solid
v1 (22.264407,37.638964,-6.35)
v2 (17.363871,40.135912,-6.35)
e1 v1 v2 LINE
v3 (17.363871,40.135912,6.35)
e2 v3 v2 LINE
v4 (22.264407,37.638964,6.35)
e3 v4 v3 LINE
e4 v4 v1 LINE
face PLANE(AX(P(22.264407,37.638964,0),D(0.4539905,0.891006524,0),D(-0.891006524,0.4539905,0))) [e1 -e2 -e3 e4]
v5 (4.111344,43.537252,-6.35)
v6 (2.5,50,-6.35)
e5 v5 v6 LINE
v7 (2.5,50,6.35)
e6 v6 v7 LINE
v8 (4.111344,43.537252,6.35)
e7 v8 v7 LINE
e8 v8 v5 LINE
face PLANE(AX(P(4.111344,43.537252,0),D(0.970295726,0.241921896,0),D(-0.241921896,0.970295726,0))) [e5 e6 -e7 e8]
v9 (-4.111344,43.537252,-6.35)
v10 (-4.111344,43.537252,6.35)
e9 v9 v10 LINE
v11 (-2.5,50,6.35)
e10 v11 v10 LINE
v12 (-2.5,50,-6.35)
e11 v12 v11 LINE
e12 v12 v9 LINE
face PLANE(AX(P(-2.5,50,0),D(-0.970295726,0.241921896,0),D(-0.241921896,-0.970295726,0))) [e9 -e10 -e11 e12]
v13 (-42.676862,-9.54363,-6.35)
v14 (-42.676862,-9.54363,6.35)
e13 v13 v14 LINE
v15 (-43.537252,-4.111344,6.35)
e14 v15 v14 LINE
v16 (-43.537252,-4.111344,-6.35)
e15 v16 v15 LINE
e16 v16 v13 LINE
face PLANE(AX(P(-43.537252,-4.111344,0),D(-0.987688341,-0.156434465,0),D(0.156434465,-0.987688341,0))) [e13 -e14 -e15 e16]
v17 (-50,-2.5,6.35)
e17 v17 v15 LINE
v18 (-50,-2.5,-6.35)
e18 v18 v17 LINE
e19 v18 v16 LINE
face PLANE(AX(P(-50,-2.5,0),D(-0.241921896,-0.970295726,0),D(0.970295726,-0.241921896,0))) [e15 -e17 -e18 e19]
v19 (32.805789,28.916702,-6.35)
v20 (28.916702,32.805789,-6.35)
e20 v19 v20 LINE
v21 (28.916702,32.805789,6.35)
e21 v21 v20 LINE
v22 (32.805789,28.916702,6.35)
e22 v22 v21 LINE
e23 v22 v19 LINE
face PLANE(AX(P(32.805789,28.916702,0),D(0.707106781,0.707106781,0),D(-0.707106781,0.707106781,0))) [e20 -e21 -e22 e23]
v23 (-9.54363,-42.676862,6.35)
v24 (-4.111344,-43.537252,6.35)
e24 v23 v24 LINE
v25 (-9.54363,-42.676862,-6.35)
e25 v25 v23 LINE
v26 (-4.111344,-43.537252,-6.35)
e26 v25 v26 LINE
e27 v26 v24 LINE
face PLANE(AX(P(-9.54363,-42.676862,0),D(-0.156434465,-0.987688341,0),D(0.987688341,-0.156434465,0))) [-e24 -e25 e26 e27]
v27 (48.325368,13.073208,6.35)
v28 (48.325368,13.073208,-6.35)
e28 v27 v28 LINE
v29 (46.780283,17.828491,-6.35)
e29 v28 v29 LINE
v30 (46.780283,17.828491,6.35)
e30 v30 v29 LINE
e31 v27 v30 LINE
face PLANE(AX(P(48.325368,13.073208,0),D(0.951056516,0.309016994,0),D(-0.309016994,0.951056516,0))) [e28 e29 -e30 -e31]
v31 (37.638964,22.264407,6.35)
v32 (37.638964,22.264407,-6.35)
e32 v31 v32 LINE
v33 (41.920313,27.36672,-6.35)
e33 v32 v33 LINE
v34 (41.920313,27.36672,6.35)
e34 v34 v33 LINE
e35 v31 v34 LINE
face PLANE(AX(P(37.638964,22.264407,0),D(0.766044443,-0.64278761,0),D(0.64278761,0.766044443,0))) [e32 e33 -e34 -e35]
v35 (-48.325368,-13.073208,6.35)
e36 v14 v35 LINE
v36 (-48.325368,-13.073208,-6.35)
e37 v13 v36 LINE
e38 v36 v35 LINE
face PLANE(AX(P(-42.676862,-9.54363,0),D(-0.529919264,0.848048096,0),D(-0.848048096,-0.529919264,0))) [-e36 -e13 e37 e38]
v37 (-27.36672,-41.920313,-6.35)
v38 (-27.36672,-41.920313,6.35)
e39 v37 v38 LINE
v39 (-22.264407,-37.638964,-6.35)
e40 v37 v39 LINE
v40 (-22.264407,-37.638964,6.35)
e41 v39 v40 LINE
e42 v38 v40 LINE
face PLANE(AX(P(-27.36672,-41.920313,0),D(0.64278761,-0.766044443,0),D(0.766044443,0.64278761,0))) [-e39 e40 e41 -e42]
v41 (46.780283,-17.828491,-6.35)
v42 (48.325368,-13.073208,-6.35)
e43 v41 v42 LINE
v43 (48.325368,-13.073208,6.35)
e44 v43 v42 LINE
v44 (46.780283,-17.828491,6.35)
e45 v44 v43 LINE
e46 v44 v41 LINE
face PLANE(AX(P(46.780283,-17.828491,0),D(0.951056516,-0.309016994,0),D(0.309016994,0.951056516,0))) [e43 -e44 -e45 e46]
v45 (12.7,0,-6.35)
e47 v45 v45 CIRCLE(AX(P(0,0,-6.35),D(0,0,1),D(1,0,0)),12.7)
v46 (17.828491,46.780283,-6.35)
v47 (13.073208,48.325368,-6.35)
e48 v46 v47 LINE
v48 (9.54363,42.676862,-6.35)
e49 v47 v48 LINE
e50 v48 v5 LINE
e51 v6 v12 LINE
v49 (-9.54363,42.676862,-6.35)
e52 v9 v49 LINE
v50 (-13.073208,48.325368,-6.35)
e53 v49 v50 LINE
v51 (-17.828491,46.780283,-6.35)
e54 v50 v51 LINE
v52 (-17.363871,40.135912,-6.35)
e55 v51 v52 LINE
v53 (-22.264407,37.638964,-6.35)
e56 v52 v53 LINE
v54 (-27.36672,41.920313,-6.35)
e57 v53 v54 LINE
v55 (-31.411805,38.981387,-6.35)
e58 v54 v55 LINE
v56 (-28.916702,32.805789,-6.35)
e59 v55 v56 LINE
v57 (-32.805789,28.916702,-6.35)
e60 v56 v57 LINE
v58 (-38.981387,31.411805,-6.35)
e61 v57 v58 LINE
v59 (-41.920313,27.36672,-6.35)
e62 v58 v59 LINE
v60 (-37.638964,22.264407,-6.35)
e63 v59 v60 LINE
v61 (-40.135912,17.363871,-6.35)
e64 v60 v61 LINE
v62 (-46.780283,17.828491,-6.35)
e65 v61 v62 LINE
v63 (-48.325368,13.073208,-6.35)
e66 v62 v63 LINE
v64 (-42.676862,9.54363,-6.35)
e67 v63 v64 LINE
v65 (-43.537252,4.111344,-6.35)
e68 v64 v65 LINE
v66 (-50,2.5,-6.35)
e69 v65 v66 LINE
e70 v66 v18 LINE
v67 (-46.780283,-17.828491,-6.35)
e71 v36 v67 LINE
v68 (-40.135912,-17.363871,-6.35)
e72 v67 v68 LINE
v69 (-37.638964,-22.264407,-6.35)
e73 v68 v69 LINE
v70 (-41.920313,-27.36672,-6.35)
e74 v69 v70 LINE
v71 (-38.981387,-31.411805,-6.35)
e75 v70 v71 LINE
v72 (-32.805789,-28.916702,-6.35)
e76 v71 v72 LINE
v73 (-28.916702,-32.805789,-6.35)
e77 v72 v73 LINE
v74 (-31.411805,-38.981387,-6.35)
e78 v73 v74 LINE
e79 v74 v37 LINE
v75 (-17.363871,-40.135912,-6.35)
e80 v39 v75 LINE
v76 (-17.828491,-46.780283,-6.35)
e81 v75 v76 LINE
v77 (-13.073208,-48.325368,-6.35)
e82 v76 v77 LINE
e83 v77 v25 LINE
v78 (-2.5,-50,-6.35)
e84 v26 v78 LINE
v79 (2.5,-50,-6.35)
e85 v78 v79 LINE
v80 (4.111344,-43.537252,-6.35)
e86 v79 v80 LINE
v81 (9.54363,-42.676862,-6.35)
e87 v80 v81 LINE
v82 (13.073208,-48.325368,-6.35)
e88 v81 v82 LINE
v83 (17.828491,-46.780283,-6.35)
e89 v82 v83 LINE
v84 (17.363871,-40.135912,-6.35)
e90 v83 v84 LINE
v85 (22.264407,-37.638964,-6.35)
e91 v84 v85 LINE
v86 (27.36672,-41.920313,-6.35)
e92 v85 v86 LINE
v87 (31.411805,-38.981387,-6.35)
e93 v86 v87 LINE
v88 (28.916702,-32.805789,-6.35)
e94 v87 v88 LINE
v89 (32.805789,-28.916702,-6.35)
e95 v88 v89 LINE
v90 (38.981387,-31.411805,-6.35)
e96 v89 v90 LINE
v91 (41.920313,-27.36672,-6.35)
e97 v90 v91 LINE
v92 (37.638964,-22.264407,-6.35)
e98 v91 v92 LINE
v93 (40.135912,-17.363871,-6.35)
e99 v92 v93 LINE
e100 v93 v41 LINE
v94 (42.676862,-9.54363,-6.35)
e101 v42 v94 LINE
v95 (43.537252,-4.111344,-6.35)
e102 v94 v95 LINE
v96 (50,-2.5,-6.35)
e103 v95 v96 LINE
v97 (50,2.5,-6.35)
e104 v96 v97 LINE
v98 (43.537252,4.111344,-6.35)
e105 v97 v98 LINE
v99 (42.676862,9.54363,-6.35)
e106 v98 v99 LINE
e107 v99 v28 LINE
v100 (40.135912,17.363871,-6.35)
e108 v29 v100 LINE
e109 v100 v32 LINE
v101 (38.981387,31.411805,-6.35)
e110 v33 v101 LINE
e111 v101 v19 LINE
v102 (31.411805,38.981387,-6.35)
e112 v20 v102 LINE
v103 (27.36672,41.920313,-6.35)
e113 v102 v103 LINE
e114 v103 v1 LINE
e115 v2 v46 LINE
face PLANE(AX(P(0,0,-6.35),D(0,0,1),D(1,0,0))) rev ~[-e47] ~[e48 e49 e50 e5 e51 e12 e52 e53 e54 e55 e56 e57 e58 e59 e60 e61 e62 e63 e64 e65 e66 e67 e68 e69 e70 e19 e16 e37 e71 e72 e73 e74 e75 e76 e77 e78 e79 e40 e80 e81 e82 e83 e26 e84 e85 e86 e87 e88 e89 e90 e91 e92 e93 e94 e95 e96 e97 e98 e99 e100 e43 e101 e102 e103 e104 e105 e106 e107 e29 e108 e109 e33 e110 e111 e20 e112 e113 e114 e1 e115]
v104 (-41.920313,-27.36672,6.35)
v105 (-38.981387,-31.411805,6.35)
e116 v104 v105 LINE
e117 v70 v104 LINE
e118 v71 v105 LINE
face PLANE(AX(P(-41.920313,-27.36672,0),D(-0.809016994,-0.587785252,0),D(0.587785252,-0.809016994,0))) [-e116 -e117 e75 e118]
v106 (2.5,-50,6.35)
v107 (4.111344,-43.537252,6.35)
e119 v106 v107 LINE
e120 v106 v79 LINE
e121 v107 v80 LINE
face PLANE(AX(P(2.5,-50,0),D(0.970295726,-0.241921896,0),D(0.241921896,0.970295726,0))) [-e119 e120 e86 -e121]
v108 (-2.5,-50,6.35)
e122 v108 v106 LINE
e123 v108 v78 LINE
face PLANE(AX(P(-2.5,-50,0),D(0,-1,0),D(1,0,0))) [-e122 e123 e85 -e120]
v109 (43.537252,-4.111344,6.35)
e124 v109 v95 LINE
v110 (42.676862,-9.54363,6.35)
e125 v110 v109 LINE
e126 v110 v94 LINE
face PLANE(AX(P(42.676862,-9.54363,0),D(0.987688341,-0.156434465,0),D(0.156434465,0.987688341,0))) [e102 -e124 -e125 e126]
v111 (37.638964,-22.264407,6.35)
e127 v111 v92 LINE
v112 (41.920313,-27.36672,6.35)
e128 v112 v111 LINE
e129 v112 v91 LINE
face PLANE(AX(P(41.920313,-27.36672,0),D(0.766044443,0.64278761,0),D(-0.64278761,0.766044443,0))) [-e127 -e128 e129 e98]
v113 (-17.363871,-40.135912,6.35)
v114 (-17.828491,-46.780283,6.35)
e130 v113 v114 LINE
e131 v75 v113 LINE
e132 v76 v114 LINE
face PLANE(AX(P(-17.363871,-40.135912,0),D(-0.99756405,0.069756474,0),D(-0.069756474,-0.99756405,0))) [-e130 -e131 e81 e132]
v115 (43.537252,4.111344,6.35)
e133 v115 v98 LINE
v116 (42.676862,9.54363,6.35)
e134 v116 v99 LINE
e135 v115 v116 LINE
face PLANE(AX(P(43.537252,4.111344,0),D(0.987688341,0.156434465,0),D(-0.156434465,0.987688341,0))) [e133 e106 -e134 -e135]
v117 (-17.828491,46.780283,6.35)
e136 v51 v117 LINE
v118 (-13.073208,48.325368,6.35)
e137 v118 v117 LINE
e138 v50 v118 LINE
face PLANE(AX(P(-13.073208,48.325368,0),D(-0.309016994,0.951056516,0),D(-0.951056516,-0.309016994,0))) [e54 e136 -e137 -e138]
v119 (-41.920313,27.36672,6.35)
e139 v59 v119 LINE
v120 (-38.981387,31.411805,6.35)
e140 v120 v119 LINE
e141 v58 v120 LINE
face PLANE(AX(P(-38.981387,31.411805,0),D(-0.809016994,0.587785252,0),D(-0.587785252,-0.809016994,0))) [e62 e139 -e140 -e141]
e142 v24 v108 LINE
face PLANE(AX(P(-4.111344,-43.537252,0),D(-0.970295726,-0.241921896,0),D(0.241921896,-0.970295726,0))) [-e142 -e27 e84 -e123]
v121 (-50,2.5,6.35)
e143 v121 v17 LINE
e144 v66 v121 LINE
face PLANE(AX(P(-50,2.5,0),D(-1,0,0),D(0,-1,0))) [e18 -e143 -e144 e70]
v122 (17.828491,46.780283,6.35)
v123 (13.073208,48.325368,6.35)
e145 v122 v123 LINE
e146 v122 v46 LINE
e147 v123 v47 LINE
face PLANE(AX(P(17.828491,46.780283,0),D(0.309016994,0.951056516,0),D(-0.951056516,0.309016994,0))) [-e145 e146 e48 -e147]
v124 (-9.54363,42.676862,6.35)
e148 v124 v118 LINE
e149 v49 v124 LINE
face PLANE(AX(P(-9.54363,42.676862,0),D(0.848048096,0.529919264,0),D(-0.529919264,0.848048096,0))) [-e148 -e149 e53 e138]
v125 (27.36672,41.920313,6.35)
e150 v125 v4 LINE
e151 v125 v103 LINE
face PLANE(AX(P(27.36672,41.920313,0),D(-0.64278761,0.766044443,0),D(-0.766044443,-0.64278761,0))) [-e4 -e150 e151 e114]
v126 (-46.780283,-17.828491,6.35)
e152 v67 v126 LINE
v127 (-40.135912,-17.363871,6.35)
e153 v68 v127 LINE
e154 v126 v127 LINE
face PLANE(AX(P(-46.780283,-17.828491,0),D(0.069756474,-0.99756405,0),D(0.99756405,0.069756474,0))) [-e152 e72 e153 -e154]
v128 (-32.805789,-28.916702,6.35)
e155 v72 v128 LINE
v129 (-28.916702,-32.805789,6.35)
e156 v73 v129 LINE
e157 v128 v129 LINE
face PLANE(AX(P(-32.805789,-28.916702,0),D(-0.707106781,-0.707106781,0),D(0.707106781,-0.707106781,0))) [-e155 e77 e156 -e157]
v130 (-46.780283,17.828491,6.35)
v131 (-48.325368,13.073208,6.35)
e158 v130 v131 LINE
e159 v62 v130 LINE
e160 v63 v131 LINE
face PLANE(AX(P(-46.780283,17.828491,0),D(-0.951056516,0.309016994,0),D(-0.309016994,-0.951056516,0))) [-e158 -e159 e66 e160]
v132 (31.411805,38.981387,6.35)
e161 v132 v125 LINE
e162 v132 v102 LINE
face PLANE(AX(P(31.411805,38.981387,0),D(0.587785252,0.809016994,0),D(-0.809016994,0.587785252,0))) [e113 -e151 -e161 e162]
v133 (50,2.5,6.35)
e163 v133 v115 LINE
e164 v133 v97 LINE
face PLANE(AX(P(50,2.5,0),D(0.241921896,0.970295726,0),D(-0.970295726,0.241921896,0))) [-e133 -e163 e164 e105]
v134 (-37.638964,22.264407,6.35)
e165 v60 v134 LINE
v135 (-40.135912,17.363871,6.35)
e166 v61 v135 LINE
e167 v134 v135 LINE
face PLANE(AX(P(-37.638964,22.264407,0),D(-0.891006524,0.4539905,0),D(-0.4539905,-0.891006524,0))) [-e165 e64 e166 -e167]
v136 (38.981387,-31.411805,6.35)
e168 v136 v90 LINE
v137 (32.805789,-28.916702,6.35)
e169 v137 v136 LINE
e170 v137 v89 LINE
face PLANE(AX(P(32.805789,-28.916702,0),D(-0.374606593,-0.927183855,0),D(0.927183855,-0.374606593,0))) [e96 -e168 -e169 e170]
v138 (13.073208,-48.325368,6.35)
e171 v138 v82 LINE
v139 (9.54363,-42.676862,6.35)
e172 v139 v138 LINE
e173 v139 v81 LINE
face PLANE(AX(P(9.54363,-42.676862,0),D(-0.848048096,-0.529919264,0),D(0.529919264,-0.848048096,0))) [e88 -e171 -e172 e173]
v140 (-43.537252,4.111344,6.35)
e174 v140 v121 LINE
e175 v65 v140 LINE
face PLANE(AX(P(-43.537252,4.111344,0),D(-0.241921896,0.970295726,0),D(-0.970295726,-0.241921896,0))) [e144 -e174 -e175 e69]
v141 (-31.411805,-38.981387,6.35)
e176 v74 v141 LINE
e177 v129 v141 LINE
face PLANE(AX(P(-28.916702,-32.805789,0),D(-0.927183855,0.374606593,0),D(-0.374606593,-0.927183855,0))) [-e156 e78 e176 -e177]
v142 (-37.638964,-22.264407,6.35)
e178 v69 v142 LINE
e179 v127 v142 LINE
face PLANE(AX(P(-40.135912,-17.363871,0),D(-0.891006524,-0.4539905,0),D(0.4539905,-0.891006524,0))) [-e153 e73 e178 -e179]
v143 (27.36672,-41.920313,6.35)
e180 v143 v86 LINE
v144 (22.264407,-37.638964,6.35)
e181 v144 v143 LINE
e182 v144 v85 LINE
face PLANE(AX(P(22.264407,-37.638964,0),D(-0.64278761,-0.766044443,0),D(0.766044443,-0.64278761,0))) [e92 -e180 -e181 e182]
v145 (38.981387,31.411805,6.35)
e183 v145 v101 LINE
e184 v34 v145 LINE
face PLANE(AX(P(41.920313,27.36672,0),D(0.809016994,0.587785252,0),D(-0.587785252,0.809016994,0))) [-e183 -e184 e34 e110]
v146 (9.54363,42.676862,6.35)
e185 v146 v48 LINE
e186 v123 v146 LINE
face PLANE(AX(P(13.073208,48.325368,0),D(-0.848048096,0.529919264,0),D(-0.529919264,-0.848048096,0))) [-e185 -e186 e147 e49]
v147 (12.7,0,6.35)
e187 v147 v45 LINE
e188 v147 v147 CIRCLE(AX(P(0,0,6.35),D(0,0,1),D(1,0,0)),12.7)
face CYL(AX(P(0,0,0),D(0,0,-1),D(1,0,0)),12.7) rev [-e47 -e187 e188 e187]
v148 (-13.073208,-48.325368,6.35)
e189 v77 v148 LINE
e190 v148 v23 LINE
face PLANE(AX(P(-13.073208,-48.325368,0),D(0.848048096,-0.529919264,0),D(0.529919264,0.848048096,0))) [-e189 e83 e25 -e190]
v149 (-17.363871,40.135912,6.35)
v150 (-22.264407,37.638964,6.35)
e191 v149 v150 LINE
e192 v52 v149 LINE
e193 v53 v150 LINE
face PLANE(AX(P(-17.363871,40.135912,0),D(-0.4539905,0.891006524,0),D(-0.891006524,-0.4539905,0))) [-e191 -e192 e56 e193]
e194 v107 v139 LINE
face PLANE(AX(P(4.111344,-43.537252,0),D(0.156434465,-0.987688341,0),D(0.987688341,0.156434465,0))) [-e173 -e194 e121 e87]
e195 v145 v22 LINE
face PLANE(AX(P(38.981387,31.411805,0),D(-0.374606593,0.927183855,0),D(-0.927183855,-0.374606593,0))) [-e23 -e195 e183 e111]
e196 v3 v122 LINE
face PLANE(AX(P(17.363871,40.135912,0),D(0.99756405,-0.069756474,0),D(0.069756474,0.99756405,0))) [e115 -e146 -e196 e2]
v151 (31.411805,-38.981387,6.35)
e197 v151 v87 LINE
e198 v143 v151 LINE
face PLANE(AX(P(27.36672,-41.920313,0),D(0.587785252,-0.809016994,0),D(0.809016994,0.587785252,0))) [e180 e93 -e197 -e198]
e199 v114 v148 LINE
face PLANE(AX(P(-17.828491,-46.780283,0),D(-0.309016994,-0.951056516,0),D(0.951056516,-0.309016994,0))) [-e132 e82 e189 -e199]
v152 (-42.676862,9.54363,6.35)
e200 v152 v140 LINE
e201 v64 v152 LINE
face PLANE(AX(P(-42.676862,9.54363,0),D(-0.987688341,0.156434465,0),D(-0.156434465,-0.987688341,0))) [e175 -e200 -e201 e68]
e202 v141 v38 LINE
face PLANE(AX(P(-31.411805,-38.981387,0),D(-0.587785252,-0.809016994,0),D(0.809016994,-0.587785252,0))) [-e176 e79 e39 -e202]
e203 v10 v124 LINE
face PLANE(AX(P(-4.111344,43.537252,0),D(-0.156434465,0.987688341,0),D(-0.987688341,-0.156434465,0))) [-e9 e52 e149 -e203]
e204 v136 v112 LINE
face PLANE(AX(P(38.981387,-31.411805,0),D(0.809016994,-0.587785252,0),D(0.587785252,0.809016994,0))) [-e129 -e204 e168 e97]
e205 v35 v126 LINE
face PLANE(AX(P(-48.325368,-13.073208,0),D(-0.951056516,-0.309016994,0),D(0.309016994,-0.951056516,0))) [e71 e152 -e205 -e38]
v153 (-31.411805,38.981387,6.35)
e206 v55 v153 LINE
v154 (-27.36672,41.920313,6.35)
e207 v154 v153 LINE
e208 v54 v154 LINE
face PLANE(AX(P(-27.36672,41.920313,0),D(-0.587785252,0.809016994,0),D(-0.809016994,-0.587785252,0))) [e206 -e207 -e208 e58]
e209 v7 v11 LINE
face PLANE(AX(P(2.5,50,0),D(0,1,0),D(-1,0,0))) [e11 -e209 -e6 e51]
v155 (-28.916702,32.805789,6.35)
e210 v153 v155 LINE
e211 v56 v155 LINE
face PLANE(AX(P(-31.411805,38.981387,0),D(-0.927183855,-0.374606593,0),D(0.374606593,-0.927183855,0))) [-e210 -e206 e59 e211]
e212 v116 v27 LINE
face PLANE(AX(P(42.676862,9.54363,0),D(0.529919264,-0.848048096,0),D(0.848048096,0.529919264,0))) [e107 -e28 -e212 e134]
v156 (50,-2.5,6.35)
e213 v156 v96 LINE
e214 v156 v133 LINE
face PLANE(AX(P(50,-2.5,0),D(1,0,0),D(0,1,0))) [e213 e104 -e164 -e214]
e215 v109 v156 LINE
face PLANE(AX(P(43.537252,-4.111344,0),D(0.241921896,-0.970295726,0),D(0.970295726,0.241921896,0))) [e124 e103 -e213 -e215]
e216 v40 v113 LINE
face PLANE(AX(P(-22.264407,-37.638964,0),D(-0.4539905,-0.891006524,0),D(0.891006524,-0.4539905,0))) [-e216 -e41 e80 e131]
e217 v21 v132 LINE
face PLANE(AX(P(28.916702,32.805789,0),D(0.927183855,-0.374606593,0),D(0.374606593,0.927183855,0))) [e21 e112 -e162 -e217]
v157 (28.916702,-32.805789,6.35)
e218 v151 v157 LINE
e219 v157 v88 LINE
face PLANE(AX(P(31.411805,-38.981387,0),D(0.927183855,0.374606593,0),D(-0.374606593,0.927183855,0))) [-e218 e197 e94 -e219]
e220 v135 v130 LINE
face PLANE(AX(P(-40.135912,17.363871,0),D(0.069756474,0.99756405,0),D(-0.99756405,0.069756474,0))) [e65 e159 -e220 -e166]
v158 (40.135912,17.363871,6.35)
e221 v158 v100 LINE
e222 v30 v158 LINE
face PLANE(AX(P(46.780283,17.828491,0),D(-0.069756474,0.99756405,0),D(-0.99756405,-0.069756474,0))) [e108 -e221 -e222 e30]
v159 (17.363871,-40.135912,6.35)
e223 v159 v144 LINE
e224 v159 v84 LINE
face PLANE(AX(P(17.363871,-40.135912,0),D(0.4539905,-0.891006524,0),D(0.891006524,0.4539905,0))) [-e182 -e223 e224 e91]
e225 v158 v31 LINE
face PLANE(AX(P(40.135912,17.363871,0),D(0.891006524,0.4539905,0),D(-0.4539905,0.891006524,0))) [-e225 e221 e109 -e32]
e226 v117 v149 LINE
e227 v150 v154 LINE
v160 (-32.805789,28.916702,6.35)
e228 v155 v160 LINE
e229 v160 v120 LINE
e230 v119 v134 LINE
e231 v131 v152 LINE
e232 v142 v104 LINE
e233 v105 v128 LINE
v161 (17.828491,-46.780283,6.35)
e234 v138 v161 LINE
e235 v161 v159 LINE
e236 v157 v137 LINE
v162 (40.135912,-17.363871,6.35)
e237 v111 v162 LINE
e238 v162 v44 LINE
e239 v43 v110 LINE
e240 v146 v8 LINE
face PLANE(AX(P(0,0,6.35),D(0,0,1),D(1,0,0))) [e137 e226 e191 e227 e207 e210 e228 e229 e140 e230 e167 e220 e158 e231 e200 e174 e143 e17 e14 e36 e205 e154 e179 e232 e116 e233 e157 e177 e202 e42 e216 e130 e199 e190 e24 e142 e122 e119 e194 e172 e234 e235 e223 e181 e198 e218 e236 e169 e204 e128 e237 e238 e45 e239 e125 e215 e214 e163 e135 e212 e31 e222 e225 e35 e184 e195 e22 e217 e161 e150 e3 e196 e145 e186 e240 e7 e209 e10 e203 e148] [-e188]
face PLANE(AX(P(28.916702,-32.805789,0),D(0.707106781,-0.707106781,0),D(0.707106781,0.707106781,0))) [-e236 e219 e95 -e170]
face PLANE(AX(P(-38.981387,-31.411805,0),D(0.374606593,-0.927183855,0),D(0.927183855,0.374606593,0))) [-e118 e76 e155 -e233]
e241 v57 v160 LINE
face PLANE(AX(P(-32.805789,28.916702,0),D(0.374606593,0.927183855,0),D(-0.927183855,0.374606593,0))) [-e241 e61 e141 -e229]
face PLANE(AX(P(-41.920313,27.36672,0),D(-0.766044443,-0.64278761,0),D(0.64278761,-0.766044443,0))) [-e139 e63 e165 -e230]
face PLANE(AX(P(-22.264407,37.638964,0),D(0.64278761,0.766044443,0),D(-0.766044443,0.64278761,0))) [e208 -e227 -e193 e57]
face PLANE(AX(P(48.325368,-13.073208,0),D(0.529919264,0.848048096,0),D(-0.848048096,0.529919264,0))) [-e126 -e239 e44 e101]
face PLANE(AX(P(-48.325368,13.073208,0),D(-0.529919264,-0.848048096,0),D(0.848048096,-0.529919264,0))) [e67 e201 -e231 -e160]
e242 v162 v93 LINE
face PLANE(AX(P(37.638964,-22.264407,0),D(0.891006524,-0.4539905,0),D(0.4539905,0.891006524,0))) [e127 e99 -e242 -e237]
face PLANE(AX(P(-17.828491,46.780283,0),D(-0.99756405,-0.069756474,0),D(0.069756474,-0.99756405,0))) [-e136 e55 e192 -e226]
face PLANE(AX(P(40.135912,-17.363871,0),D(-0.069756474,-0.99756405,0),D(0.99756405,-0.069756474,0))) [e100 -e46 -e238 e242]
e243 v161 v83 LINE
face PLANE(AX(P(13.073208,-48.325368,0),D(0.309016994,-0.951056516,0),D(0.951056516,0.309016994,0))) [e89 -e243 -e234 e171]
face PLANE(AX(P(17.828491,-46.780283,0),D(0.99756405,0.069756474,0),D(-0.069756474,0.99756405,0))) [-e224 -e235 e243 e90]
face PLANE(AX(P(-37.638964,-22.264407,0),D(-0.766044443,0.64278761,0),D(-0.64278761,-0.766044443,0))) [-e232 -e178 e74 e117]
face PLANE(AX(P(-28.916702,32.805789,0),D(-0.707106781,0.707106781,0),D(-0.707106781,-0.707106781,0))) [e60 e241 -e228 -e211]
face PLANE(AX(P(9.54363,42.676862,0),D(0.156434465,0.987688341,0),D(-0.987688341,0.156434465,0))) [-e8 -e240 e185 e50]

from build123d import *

# Parameters (mm, degrees)
F0_R     = 12.7
F1_DEPTH = 6.35


# Not quite as in the source:
# - a feature of the source that left no trace in its solid (it failed there, or was rolled back) is left out


with BuildPart() as f1:
    # F0 (on Top) → F1 (new body, symmetric)
    with BuildSketch(Plane.XY):
        Polygon((4.1113441396, 43.5372516477), (2.5, 50), (-2.5, 50), (-4.1113441396, 43.5372516477), (-9.5436300128, 42.6768620899), (-13.073208428, 48.3253683007), (-17.8284910095, 46.7802833288), (-17.3638712822, 40.1359116722), (-22.2644071652, 37.6389639237), (-27.3667201287, 41.9203128495), (-31.4118051006, 38.981386588), (-28.9167017225, 32.805789019), (-32.805789019, 28.9167017225), (-38.981386588, 31.4118051006), (-41.9203128495, 27.3667201287), (-37.6389639237, 22.2644071652), (-40.1359116722, 17.3638712822), (-46.7802833288, 17.8284910095), (-48.3253683007, 13.073208428), (-42.6768620899, 9.5436300128), (-43.5372516477, 4.1113441396), (-50, 2.5), (-50, -2.5), (-43.5372516477, -4.1113441396), (-42.6768620899, -9.5436300128), (-48.3253683007, -13.073208428), (-46.7802833288, -17.8284910095), (-40.1359116722, -17.3638712822), (-37.6389639237, -22.2644071652), (-41.9203128495, -27.3667201287), (-38.981386588, -31.4118051006), (-32.805789019, -28.9167017225), (-28.9167017225, -32.805789019), (-31.4118051006, -38.981386588), (-27.3667201287, -41.9203128495), (-22.2644071652, -37.6389639237), (-17.3638712822, -40.1359116722), (-17.8284910095, -46.7802833288), (-13.073208428, -48.3253683007), (-9.5436300128, -42.6768620899), (-4.1113441396, -43.5372516477), (-2.5, -50), (2.5, -50), (4.1113441396, -43.5372516477), (9.5436300128, -42.6768620899), (13.073208428, -48.3253683007), (17.8284910095, -46.7802833288), (17.3638712822, -40.1359116722), (22.2644071652, -37.6389639237), (27.3667201287, -41.9203128495), (31.4118051006, -38.981386588), (28.9167017225, -32.805789019), (32.805789019, -28.9167017225), (38.981386588, -31.4118051006), (41.9203128495, -27.3667201287), (37.6389639237, -22.2644071652), (40.1359116722, -17.3638712822), (46.7802833288, -17.8284910095), (48.3253683007, -13.073208428), (42.6768620899, -9.5436300128), (43.5372516477, -4.1113441396), (50, -2.5), (50, 2.5), (43.5372516477, 4.1113441396), (42.6768620899, 9.5436300128), (48.3253683007, 13.073208428), (46.7802833288, 17.8284910095), (40.1359116722, 17.3638712822), (37.6389639237, 22.2644071652), (41.9203128495, 27.3667201287), (38.981386588, 31.4118051006), (32.805789019, 28.9167017225), (28.9167017225, 32.805789019), (31.4118051006, 38.981386588), (27.3667201287, 41.9203128495), (22.2644071652, 37.6389639237), (17.3638712822, 40.1359116722), (17.8284910095, 46.7802833288), (13.073208428, 48.3253683007), (9.5436300128, 42.6768620899), align=None)
        Circle(F0_R, mode=Mode.SUBTRACT)
    extrude(amount=F1_DEPTH, both=True)


solid = f1.part
